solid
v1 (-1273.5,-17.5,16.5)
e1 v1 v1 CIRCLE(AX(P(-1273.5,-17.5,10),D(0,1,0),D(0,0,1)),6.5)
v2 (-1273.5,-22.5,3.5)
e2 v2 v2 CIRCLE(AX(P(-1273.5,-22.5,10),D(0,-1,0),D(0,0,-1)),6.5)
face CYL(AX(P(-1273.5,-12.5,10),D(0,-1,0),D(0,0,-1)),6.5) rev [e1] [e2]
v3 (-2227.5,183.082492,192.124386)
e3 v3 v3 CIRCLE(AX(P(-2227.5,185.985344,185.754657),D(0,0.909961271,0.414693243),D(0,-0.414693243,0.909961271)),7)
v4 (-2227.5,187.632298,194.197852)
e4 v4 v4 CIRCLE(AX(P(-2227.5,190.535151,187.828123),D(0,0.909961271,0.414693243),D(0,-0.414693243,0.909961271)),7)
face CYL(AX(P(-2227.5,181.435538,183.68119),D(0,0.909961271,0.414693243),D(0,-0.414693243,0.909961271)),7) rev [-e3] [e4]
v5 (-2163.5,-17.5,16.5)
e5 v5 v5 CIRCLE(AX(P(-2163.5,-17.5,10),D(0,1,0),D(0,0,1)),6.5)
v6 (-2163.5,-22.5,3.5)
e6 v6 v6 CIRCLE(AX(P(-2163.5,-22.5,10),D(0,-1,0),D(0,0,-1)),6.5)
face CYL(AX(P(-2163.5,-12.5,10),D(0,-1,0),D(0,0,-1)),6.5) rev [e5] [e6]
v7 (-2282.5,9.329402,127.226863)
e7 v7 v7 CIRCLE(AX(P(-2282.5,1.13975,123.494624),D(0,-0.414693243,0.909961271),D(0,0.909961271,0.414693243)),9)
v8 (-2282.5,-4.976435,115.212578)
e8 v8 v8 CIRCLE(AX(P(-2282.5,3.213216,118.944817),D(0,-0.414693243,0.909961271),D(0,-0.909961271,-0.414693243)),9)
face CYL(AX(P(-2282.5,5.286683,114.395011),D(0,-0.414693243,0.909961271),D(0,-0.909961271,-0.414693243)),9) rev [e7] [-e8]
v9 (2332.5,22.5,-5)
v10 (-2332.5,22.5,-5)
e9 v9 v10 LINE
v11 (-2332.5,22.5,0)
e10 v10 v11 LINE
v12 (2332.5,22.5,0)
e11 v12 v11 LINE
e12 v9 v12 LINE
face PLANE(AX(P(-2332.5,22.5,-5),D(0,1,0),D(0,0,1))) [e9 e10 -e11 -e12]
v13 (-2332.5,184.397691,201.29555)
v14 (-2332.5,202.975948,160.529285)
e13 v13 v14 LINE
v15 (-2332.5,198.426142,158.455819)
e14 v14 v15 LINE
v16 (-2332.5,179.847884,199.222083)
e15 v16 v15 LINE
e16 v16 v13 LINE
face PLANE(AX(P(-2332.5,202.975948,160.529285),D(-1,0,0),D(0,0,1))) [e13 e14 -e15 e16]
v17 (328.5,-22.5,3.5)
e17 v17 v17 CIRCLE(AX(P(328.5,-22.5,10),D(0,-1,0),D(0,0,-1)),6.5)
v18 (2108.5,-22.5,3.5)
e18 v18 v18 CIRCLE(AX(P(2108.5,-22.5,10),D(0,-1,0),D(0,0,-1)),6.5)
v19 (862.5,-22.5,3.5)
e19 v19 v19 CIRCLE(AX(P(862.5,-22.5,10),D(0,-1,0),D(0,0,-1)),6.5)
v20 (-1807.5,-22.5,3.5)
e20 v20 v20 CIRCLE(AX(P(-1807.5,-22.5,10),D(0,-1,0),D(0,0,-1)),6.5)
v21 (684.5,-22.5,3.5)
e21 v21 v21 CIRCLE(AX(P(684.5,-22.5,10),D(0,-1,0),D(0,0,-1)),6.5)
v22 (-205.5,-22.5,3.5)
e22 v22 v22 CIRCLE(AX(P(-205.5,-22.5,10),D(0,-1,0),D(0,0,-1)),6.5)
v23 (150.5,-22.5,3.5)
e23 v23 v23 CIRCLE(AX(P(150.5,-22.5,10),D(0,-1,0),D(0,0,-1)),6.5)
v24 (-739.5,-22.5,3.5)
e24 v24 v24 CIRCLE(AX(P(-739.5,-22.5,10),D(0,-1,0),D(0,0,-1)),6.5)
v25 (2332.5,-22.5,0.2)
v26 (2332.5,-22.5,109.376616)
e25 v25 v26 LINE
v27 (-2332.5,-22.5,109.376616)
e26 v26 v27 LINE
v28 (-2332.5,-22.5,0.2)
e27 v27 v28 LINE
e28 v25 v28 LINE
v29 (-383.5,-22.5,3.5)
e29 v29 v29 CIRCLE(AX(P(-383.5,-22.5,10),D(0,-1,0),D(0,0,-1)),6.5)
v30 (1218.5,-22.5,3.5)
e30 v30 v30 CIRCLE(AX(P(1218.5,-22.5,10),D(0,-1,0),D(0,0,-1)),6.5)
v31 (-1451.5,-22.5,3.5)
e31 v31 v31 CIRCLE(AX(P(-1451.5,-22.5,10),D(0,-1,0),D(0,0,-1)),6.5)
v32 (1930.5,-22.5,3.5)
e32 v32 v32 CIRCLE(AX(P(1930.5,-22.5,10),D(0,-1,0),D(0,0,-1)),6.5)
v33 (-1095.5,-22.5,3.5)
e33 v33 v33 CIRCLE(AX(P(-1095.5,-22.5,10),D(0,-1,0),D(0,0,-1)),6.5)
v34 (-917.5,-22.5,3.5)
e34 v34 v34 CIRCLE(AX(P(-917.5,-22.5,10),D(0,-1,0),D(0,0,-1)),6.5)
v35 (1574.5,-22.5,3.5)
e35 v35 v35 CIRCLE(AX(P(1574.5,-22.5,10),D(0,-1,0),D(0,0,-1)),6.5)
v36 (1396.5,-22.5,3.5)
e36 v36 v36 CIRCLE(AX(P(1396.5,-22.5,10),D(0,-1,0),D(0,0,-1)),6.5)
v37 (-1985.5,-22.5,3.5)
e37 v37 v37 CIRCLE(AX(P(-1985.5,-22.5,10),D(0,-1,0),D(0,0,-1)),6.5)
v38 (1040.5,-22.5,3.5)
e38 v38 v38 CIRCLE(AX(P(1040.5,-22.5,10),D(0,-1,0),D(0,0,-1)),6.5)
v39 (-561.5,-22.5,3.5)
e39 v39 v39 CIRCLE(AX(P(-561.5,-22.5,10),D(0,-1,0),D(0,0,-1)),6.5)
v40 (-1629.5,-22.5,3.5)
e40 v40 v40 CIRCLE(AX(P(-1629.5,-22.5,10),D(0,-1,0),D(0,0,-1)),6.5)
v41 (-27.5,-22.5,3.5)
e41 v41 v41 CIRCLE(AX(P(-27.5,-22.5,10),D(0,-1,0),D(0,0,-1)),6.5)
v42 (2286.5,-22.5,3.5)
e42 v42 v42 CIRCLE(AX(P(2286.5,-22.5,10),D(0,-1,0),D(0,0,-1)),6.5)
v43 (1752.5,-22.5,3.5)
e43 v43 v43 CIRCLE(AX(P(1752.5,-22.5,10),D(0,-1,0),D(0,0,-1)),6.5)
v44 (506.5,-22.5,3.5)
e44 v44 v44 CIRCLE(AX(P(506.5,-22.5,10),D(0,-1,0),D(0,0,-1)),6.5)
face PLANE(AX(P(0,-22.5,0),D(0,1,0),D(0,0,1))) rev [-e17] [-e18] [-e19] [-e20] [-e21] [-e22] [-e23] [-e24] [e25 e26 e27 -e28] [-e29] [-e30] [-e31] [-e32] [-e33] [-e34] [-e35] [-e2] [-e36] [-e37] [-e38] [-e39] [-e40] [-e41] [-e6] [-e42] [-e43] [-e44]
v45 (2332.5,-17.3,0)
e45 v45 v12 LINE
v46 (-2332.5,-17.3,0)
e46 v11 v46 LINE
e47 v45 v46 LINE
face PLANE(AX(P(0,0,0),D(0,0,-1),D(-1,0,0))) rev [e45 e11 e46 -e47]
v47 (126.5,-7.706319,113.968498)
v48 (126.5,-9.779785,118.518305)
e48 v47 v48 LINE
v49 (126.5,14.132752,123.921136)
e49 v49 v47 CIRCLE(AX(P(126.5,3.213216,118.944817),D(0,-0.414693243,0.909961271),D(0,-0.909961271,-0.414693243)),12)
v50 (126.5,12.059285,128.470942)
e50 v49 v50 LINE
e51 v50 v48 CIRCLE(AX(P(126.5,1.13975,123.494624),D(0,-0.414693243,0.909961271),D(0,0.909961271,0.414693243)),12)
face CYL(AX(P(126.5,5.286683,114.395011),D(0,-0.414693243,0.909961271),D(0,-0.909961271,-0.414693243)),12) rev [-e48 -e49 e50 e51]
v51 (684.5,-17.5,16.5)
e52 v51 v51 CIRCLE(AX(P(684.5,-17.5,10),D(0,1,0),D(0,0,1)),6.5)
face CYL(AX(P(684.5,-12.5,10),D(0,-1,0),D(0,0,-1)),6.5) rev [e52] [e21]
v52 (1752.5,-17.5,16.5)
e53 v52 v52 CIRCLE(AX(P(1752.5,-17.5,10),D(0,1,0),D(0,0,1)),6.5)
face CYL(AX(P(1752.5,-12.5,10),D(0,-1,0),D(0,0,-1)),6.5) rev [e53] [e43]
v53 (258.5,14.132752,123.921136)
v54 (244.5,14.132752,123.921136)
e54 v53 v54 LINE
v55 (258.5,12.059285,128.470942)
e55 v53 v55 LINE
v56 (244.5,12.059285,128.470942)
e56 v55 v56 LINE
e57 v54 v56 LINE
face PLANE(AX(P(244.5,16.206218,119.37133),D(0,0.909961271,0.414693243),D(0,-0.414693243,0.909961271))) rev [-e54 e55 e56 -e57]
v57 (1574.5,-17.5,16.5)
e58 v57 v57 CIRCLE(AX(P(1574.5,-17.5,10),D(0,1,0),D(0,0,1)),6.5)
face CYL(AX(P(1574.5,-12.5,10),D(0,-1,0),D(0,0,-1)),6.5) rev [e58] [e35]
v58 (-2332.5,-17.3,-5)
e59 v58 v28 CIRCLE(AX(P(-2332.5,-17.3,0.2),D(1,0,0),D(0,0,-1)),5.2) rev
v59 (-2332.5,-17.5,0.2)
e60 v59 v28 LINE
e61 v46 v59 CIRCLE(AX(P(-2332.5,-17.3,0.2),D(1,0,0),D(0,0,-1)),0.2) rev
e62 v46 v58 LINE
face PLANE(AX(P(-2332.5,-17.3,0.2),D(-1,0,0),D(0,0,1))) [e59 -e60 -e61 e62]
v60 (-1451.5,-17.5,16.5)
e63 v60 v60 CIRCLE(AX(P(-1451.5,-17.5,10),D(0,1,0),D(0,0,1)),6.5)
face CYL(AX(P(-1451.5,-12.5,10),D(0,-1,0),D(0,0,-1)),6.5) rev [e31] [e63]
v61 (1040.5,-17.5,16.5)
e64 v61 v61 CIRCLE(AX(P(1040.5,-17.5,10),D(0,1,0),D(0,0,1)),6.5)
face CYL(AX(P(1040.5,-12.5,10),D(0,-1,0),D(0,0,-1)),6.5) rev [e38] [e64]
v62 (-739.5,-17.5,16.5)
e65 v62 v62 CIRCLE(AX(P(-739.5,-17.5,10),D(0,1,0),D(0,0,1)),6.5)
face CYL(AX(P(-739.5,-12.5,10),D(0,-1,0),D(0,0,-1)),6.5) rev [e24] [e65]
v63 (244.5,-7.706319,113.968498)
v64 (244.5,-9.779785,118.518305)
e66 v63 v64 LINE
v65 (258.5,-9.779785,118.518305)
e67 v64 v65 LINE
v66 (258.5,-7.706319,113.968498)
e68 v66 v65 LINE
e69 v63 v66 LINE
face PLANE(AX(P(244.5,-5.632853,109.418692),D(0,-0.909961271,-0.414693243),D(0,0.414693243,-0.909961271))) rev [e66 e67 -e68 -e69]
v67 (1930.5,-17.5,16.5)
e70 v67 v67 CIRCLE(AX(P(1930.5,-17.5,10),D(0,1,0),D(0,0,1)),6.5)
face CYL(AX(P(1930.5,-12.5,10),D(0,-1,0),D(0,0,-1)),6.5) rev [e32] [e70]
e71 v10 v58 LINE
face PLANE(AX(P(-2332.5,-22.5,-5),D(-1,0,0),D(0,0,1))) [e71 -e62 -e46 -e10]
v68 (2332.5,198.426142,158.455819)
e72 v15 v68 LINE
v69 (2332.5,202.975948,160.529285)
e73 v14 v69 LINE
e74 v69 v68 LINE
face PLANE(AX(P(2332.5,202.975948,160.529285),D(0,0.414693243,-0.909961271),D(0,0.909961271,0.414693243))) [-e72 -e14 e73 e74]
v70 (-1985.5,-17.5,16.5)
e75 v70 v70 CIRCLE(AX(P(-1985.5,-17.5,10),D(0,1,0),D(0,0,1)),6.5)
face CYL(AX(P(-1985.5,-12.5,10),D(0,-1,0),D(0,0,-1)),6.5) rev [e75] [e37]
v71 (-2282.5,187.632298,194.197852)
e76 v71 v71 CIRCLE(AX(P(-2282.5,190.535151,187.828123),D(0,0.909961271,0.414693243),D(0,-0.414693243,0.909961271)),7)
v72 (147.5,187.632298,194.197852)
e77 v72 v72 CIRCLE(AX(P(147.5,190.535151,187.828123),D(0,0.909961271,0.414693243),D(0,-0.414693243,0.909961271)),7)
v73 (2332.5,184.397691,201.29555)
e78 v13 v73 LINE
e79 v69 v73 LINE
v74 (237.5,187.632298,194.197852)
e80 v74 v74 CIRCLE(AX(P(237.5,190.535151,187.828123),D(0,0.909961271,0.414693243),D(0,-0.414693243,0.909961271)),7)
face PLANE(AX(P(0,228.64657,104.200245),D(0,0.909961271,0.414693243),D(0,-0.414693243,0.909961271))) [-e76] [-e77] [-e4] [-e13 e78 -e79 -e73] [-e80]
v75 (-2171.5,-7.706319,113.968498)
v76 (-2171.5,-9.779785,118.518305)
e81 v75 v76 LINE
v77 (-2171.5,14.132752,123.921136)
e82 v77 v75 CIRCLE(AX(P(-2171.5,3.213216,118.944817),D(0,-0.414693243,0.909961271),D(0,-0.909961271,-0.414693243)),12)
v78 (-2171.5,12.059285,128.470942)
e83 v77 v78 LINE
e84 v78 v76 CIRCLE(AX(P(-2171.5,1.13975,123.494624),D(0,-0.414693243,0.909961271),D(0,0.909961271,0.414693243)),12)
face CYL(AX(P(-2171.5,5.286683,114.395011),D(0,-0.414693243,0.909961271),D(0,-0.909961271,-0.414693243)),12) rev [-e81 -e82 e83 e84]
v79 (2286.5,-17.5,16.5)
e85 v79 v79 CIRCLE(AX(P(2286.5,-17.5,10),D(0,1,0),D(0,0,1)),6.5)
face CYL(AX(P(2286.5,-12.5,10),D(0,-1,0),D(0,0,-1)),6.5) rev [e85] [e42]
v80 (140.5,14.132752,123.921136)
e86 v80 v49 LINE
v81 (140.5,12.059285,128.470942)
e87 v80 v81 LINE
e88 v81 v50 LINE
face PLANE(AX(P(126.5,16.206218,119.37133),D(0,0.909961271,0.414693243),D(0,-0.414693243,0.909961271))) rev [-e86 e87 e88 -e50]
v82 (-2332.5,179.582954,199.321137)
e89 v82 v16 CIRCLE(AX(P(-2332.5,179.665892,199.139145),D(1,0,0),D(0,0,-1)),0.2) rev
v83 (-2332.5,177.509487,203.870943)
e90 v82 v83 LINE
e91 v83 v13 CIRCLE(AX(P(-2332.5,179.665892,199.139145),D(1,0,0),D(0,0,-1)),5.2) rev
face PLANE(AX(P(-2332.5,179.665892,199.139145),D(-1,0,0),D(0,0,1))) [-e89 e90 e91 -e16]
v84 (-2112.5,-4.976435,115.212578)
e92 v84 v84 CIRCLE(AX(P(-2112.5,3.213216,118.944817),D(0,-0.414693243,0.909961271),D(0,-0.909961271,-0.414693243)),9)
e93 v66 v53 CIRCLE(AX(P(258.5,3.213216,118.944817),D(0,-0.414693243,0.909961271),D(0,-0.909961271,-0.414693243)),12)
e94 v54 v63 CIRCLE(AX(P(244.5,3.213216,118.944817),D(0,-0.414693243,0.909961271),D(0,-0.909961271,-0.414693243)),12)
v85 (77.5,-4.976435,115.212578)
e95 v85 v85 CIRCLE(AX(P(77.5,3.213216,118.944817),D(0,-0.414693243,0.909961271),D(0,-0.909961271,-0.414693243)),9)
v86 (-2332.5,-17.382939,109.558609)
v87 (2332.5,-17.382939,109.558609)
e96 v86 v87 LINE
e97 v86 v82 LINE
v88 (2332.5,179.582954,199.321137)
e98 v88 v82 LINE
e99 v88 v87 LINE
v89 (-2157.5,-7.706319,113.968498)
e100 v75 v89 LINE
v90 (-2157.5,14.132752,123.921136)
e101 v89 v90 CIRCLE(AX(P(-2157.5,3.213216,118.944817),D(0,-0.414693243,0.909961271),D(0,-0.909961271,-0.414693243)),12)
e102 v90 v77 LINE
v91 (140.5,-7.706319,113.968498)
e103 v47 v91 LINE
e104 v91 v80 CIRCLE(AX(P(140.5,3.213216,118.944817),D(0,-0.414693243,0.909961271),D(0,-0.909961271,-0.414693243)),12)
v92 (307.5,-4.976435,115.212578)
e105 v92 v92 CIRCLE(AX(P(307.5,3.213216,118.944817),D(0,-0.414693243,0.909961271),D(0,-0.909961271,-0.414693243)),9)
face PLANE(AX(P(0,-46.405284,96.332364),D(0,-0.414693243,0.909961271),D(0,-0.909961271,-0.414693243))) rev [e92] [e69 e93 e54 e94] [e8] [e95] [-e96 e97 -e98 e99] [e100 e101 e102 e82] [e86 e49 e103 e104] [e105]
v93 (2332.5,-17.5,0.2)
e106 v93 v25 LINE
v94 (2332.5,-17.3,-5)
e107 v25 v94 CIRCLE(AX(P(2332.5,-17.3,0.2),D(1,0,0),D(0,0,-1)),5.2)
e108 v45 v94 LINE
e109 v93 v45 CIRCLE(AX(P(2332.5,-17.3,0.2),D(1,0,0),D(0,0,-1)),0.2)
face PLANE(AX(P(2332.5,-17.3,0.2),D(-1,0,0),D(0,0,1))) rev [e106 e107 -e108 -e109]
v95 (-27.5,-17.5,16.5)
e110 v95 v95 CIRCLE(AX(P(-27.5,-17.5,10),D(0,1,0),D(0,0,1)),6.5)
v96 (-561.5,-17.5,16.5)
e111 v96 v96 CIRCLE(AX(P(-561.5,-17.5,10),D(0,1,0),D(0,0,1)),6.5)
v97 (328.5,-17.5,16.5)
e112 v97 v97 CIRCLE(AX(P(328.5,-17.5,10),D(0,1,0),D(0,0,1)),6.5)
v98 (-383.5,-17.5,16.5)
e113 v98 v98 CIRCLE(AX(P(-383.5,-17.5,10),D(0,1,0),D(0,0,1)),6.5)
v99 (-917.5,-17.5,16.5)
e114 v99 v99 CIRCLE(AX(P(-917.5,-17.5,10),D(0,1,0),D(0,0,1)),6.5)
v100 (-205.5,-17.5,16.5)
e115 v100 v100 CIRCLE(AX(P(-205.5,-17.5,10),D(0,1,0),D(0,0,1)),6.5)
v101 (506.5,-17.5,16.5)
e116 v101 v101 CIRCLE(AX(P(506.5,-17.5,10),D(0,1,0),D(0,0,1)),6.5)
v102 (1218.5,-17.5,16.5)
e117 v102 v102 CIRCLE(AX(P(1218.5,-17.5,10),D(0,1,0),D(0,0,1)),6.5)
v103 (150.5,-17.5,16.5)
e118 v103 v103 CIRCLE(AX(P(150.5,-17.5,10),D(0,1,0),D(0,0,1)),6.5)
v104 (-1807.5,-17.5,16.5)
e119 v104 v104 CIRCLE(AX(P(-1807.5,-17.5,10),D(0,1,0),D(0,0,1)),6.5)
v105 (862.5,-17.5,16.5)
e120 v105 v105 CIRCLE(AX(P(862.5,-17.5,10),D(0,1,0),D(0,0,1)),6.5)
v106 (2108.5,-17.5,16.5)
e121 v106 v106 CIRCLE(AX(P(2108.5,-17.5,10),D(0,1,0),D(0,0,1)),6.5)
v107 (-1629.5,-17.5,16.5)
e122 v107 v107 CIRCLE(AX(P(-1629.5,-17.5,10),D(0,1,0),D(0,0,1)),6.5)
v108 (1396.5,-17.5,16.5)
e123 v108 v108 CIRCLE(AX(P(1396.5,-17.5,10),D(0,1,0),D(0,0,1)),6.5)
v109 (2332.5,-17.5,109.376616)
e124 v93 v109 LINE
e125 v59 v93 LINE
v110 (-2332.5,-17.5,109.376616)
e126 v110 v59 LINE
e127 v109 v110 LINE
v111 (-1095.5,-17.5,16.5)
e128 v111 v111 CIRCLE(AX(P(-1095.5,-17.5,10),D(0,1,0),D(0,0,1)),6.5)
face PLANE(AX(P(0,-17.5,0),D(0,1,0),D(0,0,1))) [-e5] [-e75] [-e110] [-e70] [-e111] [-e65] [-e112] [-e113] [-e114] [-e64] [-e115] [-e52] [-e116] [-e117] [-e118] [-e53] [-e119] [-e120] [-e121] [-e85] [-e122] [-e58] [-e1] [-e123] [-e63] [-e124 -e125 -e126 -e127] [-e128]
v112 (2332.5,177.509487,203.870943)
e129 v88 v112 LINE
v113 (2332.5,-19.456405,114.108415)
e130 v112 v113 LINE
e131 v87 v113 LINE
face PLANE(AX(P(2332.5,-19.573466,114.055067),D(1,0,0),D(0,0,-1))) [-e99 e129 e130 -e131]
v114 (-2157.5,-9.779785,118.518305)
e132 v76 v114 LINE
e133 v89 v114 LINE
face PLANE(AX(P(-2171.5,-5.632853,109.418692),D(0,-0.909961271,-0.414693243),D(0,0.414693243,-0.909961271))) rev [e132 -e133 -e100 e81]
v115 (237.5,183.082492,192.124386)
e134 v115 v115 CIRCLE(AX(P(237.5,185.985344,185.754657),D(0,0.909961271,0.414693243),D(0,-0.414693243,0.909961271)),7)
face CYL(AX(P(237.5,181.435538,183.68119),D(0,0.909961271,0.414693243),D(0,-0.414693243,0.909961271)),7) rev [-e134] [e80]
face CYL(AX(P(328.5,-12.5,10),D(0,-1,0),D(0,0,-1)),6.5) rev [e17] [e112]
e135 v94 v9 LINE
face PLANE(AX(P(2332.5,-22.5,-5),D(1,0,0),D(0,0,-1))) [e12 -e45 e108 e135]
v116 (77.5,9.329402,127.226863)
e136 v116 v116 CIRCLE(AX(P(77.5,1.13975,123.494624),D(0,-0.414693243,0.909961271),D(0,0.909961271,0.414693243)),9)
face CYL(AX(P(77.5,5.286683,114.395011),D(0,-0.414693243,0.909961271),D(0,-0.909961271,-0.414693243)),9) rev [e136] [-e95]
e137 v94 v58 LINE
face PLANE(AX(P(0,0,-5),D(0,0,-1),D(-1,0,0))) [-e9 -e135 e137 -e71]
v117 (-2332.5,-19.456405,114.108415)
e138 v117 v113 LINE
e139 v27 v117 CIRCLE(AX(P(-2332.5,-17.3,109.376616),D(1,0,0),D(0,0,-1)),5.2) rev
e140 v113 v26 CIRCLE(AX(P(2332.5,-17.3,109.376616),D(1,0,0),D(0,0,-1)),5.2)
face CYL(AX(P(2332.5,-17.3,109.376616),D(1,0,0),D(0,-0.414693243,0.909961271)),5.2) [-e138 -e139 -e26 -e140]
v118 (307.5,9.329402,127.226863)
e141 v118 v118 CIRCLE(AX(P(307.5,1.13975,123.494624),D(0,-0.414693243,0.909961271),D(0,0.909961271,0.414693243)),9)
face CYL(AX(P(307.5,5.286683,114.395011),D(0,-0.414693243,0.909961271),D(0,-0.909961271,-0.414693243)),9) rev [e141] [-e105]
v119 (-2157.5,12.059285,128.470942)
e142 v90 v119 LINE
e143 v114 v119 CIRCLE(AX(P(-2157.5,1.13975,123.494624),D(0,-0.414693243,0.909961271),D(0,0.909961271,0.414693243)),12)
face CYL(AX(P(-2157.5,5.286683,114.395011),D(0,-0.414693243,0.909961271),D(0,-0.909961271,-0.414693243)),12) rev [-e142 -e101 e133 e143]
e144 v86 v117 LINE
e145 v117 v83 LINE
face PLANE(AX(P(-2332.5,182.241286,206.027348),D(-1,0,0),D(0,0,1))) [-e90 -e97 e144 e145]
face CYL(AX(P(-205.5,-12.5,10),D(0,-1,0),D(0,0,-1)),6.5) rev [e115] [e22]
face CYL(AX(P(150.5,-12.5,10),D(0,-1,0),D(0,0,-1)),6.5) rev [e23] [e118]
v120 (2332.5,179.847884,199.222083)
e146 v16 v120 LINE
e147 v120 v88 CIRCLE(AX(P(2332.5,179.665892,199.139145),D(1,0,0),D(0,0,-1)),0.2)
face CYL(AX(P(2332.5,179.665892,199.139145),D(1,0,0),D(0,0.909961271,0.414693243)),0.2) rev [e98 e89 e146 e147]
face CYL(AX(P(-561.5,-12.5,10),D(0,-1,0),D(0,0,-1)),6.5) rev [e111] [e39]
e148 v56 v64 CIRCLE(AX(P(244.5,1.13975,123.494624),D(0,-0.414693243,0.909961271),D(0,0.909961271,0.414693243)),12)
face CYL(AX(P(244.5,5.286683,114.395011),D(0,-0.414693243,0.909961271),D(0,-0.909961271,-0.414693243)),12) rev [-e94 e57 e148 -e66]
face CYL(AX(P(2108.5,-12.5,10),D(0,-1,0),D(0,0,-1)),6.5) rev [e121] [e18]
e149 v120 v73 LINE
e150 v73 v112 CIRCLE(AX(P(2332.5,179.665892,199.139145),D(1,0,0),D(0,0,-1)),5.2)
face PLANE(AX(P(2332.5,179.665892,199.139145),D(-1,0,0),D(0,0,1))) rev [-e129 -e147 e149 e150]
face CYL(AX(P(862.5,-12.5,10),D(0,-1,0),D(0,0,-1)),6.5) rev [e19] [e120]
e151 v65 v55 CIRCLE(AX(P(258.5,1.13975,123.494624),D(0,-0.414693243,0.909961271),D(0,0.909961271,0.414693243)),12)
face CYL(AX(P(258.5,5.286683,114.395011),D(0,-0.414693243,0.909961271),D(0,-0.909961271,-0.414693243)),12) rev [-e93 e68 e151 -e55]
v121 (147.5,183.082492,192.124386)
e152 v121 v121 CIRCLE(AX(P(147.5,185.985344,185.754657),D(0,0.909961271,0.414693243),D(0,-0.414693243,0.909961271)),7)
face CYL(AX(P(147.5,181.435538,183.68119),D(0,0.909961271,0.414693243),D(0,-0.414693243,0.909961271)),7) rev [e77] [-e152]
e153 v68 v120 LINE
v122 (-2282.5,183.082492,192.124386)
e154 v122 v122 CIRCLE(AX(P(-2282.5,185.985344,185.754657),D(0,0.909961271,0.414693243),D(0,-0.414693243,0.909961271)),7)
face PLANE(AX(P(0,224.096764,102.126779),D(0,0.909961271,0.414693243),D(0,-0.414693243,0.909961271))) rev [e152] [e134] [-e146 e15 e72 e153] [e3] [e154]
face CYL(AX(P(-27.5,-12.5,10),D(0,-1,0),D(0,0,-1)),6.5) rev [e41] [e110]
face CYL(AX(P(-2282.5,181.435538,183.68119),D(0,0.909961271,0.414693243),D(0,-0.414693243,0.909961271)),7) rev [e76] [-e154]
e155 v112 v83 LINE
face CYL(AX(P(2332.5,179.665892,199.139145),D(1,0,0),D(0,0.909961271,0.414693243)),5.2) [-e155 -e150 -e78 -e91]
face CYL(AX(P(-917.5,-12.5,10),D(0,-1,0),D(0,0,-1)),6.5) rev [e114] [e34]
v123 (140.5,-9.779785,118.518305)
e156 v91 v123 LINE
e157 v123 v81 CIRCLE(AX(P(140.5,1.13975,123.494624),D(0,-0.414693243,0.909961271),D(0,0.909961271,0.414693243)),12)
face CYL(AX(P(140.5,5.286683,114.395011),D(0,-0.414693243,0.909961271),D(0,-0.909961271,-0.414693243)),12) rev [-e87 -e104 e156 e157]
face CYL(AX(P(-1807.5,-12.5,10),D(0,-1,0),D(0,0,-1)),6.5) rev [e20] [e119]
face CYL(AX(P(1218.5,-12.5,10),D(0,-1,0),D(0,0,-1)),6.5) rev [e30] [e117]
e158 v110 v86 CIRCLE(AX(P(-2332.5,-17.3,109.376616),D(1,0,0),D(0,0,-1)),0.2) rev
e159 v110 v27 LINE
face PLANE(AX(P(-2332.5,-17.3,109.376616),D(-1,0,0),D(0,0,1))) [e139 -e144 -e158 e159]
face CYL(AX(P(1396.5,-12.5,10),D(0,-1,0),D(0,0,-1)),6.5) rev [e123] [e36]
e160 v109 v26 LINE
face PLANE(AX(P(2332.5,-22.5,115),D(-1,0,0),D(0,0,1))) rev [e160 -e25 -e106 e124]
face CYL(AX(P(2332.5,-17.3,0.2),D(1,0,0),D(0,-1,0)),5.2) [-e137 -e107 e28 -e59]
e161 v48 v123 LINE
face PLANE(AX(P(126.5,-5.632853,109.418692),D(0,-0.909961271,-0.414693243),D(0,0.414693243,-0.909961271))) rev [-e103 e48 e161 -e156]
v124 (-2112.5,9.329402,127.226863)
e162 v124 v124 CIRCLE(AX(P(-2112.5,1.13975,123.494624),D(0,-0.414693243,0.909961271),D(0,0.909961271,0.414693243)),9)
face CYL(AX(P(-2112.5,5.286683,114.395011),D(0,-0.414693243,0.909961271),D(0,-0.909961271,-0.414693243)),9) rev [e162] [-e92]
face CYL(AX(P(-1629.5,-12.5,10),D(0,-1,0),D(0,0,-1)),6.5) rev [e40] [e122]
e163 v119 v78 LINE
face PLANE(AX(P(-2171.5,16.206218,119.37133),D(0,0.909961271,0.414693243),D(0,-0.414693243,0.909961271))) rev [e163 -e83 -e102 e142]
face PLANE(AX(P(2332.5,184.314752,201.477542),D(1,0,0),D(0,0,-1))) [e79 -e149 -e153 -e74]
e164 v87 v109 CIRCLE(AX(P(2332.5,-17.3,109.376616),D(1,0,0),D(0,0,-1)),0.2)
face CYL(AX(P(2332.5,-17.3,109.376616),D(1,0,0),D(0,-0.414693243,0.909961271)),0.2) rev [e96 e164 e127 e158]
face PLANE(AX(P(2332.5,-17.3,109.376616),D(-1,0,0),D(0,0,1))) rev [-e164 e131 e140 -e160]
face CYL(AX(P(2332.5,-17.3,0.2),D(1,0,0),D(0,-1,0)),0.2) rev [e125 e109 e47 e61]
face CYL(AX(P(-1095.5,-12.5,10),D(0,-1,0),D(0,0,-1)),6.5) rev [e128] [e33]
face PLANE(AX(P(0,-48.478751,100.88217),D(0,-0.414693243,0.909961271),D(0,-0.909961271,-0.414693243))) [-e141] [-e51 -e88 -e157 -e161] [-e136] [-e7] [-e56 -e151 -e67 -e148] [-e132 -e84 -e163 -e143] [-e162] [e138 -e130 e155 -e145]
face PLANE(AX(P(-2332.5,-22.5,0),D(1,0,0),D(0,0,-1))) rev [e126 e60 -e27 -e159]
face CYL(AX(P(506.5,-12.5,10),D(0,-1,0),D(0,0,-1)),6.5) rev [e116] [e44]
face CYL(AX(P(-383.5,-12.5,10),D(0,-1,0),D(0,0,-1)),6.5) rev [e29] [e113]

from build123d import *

# Parameters (mm, degrees)
SKETCH1_W                    = 4665
SKETCH1_H                    = 45
BASE_FLANGE1_DEPTH           = 5
EDGE_FLANGE1_STRIP_W         = 20.4
EDGE_FLANGE1_STRIP_H         = 5
EDGE_FLANGE1_STRIP_CUT_DEPTH = 4665
EDGE_FLANGE1_DEPTH           = 4665
EDGE_FLANGE2_START           = -2332.5
EDGE_FLANGE2_DEPTH           = 4665
EDGE_FLANGE2_2_DEPTH         = 4665
EDGE_FLANGE3_STRIP_W         = 20.4
EDGE_FLANGE3_STRIP_H         = 5
EDGE_FLANGE3_STRIP_CUT_DEPTH = 4665
EDGE_FLANGE3_DEPTH           = 4665
SKETCH15_R                   = 7
CUT_EXTRUDE1_DEPTH           = 10
SKETCH16_R                   = 7
CUT_EXTRUDE2_DEPTH           = 10
SKETCH17_R                   = 6.5
CUT_EXTRUDE3_DEPTH           = 10
LPATTERN1_COUNT              = 26
LPATTERN1_PITCH              = 178
SKETCH18_R                   = 9
CUT_EXTRUDE4_DEPTH           = 10


# Read off the part's stored shape, not the designer's step: Edge-Flange2
# Sheet-metal steps are written as plain solids
with BuildPart() as part:
    # Sketch1 → Base-Flange1 (new body)
    with BuildSketch(Plane.XY):
        Rectangle(SKETCH1_W, SKETCH1_H)
    extrude(amount=-BASE_FLANGE1_DEPTH)

    # Edge-Flange1 strip (across the edge) → Edge-Flange1 strip cut (cut)
    with BuildSketch(Plane(origin=(-2332.5, -22.5, 0), x_dir=(0, 1, 0), z_dir=(1, 0, 0))):
        with Locations((-5, -2.5)):
            Rectangle(EDGE_FLANGE1_STRIP_W, EDGE_FLANGE1_STRIP_H)
    extrude(amount=EDGE_FLANGE1_STRIP_CUT_DEPTH, mode=Mode.SUBTRACT)

    # Edge-Flange1 section (across the edge) → Edge-Flange1 (add)
    with BuildSketch(Plane(origin=(-2332.5, -22.5, 0), x_dir=(0, 1, 0), z_dir=(1, 0, 0))):
        with BuildLine():
            Line((0, 0.2), (0, 115))
            Line((0, 115), (5, 115))
            Line((5, 115), (5, 0.2))
            ThreePointArc((5, 0.2), (5.058578644, 0.058578644), (5.2, 0))
            Line((5.2, 0), (5.2, -5))
            ThreePointArc((5.2, -5), (1.523044738, -3.476955262), (0, 0.2))
        make_face()
    extrude(amount=EDGE_FLANGE1_DEPTH)

    # Edge-Flange2 outline → Edge-Flange2 (cut)
    with BuildSketch(Plane.YZ.offset(EDGE_FLANGE2_START)):
        with BuildLine():
            ThreePointArc((-22.5, 109.376616329), (-21.673402867, 112.18968358), (-19.456404862, 114.108414938))
            Line((-19.456404862, 114.108414938), (-17.5, 115))
            Line((-17.5, 115), (-22.5, 115))
            Line((-22.5, 115), (-22.5, 109.376616329))
        make_face()
    extrude(amount=EDGE_FLANGE2_DEPTH, mode=Mode.SUBTRACT)

    # Edge-Flange2 2 outline → Edge-Flange2 2 (add)
    with BuildSketch(Plane.YZ.offset(EDGE_FLANGE2_START)):
        with BuildLine():
            Line((182.241285947, 206.02734832), (-17.5, 115))
            Line((-17.5, 115), (-17.5, 109.376616329))
            ThreePointArc((-17.5, 109.376616329), (-17.468207803, 109.484811224), (-17.382938649, 109.558608584))
            Line((-17.382938649, 109.558608584), (184.314752161, 201.477541966))
            Line((184.314752161, 201.477541966), (182.241285947, 206.02734832))
        make_face()
    extrude(amount=EDGE_FLANGE2_2_DEPTH)

    # Edge-Flange3 strip (across the edge) → Edge-Flange3 strip cut (cut)
    with BuildSketch(Plane(origin=(-2332.5, 184.314752161, 201.477541966), x_dir=(0, -0.9099612708765384, -0.4146932426562495), z_dir=(1, 0, 0))):
        with Locations((-5, -2.5)):
            Rectangle(EDGE_FLANGE3_STRIP_W, EDGE_FLANGE3_STRIP_H)
    extrude(amount=EDGE_FLANGE3_STRIP_CUT_DEPTH, mode=Mode.SUBTRACT)

    # Edge-Flange3 section (across the edge) → Edge-Flange3 (add)
    with BuildSketch(Plane(origin=(-2332.5, 184.314752161, 201.477541966), x_dir=(0, -0.9099612708765384, -0.4146932426562495), z_dir=(1, 0, 0))):
        with BuildLine():
            Line((0, 0.2), (0, 45))
            Line((0, 45), (5, 45))
            Line((5, 45), (5, 0.2))
            ThreePointArc((5, 0.2), (5.058578644, 0.058578644), (5.2, 0))
            Line((5.2, 0), (5.2, -5))
            ThreePointArc((5.2, -5), (1.523044738, -3.476955262), (0, 0.2))
        make_face()
    extrude(amount=EDGE_FLANGE3_DEPTH)

    # Sketch15 → Cut-Extrude1 (cut)
    with BuildSketch(Plane(origin=(0, 228.646570306, 104.200245326), x_dir=(1, 0, 0), z_dir=(0, 0.9099612708765382, 0.4146932426562498))):
        with Locations(Location((-2282.5, -91.902677897, 0), (0, 0, 270))):
            Circle(SKETCH15_R)
        with Locations(Location((-2227.5, -91.902677897, 0), (0, 0, 270))):
            Circle(SKETCH15_R)
    extrude(amount=-CUT_EXTRUDE1_DEPTH, mode=Mode.SUBTRACT)

    # Sketch16 → Cut-Extrude2 (cut)
    with BuildSketch(Plane(origin=(0, 228.646570306, 104.200245326), x_dir=(1, 0, 0), z_dir=(0, 0.9099612708765383, 0.41469324265624985))):
        with Locations(Location((237.5, -91.902677897, 0), (0, 0, 270))):
            Circle(SKETCH16_R)
        with Locations(Location((147.5, -91.902677897, 0), (0, 0, 270))):
            Circle(SKETCH16_R)
    extrude(amount=-CUT_EXTRUDE2_DEPTH, mode=Mode.SUBTRACT)

    # Sketch17 → Cut-Extrude3 (cut)
    with BuildSketch(Plane.XZ.offset(22.5)):
        with Locations(Location((-2163.5, 10, 0), (0, 0, 270))):
            Circle(SKETCH17_R)
    cut_extrude3 = extrude(amount=-CUT_EXTRUDE3_DEPTH, mode=Mode.SUBTRACT)

    # LPattern1: Cut-Extrude3 ×26
    with Locations(*[(i * LPATTERN1_PITCH, 0, 0) for i in range(1, LPATTERN1_COUNT)]):
        add(cut_extrude3, mode=Mode.SUBTRACT)

    # Sketch18 → Cut-Extrude4 (cut)
    with BuildSketch(Plane(origin=(0, -46.405284359, 101.827102994), x_dir=(1, 0, 0), z_dir=(0, -0.4146932426562464, 0.90996127087654))):
        with Locations(Location((-2112.5, 52.249514406, 0), (0, 0, 270))):
            Circle(SKETCH18_R)
        with Locations(Location((-2282.5, 52.249514406, 0), (0, 0, 270))):
            Circle(SKETCH18_R)
        with Locations(Location((307.5, 52.249514406, 0), (0, 0, 270))):
            Circle(SKETCH18_R)
        with Locations(Location((77.5, 52.249514406, 0), (0, 0, 270))):
            Circle(SKETCH18_R)
        with BuildLine():
            Line((-2171.5, 40.249514406), (-2157.5, 40.249514406))
            ThreePointArc((-2157.5, 40.249514406), (-2145.5, 52.249514406), (-2157.5, 64.249514406))
            Line((-2157.5, 64.249514406), (-2171.5, 64.249514406))
            ThreePointArc((-2171.5, 64.249514406), (-2183.5, 52.249514406), (-2171.5, 40.249514406))
        make_face()
        with BuildLine():
            Line((126.5, 40.249514406), (140.5, 40.249514406))
            ThreePointArc((140.5, 40.249514406), (152.5, 52.249514406), (140.5, 64.249514406))
            Line((140.5, 64.249514406), (126.5, 64.249514406))
            ThreePointArc((126.5, 64.249514406), (114.5, 52.249514406), (126.5, 40.249514406))
        make_face()
        with BuildLine():
            Line((244.5, 40.249514406), (258.5, 40.249514406))
            ThreePointArc((258.5, 40.249514406), (270.5, 52.249514406), (258.5, 64.249514406))
            Line((258.5, 64.249514406), (244.5, 64.249514406))
            ThreePointArc((244.5, 64.249514406), (232.5, 52.249514406), (244.5, 40.249514406))
        make_face()
    extrude(amount=-CUT_EXTRUDE4_DEPTH, mode=Mode.SUBTRACT)


solid = part.part
